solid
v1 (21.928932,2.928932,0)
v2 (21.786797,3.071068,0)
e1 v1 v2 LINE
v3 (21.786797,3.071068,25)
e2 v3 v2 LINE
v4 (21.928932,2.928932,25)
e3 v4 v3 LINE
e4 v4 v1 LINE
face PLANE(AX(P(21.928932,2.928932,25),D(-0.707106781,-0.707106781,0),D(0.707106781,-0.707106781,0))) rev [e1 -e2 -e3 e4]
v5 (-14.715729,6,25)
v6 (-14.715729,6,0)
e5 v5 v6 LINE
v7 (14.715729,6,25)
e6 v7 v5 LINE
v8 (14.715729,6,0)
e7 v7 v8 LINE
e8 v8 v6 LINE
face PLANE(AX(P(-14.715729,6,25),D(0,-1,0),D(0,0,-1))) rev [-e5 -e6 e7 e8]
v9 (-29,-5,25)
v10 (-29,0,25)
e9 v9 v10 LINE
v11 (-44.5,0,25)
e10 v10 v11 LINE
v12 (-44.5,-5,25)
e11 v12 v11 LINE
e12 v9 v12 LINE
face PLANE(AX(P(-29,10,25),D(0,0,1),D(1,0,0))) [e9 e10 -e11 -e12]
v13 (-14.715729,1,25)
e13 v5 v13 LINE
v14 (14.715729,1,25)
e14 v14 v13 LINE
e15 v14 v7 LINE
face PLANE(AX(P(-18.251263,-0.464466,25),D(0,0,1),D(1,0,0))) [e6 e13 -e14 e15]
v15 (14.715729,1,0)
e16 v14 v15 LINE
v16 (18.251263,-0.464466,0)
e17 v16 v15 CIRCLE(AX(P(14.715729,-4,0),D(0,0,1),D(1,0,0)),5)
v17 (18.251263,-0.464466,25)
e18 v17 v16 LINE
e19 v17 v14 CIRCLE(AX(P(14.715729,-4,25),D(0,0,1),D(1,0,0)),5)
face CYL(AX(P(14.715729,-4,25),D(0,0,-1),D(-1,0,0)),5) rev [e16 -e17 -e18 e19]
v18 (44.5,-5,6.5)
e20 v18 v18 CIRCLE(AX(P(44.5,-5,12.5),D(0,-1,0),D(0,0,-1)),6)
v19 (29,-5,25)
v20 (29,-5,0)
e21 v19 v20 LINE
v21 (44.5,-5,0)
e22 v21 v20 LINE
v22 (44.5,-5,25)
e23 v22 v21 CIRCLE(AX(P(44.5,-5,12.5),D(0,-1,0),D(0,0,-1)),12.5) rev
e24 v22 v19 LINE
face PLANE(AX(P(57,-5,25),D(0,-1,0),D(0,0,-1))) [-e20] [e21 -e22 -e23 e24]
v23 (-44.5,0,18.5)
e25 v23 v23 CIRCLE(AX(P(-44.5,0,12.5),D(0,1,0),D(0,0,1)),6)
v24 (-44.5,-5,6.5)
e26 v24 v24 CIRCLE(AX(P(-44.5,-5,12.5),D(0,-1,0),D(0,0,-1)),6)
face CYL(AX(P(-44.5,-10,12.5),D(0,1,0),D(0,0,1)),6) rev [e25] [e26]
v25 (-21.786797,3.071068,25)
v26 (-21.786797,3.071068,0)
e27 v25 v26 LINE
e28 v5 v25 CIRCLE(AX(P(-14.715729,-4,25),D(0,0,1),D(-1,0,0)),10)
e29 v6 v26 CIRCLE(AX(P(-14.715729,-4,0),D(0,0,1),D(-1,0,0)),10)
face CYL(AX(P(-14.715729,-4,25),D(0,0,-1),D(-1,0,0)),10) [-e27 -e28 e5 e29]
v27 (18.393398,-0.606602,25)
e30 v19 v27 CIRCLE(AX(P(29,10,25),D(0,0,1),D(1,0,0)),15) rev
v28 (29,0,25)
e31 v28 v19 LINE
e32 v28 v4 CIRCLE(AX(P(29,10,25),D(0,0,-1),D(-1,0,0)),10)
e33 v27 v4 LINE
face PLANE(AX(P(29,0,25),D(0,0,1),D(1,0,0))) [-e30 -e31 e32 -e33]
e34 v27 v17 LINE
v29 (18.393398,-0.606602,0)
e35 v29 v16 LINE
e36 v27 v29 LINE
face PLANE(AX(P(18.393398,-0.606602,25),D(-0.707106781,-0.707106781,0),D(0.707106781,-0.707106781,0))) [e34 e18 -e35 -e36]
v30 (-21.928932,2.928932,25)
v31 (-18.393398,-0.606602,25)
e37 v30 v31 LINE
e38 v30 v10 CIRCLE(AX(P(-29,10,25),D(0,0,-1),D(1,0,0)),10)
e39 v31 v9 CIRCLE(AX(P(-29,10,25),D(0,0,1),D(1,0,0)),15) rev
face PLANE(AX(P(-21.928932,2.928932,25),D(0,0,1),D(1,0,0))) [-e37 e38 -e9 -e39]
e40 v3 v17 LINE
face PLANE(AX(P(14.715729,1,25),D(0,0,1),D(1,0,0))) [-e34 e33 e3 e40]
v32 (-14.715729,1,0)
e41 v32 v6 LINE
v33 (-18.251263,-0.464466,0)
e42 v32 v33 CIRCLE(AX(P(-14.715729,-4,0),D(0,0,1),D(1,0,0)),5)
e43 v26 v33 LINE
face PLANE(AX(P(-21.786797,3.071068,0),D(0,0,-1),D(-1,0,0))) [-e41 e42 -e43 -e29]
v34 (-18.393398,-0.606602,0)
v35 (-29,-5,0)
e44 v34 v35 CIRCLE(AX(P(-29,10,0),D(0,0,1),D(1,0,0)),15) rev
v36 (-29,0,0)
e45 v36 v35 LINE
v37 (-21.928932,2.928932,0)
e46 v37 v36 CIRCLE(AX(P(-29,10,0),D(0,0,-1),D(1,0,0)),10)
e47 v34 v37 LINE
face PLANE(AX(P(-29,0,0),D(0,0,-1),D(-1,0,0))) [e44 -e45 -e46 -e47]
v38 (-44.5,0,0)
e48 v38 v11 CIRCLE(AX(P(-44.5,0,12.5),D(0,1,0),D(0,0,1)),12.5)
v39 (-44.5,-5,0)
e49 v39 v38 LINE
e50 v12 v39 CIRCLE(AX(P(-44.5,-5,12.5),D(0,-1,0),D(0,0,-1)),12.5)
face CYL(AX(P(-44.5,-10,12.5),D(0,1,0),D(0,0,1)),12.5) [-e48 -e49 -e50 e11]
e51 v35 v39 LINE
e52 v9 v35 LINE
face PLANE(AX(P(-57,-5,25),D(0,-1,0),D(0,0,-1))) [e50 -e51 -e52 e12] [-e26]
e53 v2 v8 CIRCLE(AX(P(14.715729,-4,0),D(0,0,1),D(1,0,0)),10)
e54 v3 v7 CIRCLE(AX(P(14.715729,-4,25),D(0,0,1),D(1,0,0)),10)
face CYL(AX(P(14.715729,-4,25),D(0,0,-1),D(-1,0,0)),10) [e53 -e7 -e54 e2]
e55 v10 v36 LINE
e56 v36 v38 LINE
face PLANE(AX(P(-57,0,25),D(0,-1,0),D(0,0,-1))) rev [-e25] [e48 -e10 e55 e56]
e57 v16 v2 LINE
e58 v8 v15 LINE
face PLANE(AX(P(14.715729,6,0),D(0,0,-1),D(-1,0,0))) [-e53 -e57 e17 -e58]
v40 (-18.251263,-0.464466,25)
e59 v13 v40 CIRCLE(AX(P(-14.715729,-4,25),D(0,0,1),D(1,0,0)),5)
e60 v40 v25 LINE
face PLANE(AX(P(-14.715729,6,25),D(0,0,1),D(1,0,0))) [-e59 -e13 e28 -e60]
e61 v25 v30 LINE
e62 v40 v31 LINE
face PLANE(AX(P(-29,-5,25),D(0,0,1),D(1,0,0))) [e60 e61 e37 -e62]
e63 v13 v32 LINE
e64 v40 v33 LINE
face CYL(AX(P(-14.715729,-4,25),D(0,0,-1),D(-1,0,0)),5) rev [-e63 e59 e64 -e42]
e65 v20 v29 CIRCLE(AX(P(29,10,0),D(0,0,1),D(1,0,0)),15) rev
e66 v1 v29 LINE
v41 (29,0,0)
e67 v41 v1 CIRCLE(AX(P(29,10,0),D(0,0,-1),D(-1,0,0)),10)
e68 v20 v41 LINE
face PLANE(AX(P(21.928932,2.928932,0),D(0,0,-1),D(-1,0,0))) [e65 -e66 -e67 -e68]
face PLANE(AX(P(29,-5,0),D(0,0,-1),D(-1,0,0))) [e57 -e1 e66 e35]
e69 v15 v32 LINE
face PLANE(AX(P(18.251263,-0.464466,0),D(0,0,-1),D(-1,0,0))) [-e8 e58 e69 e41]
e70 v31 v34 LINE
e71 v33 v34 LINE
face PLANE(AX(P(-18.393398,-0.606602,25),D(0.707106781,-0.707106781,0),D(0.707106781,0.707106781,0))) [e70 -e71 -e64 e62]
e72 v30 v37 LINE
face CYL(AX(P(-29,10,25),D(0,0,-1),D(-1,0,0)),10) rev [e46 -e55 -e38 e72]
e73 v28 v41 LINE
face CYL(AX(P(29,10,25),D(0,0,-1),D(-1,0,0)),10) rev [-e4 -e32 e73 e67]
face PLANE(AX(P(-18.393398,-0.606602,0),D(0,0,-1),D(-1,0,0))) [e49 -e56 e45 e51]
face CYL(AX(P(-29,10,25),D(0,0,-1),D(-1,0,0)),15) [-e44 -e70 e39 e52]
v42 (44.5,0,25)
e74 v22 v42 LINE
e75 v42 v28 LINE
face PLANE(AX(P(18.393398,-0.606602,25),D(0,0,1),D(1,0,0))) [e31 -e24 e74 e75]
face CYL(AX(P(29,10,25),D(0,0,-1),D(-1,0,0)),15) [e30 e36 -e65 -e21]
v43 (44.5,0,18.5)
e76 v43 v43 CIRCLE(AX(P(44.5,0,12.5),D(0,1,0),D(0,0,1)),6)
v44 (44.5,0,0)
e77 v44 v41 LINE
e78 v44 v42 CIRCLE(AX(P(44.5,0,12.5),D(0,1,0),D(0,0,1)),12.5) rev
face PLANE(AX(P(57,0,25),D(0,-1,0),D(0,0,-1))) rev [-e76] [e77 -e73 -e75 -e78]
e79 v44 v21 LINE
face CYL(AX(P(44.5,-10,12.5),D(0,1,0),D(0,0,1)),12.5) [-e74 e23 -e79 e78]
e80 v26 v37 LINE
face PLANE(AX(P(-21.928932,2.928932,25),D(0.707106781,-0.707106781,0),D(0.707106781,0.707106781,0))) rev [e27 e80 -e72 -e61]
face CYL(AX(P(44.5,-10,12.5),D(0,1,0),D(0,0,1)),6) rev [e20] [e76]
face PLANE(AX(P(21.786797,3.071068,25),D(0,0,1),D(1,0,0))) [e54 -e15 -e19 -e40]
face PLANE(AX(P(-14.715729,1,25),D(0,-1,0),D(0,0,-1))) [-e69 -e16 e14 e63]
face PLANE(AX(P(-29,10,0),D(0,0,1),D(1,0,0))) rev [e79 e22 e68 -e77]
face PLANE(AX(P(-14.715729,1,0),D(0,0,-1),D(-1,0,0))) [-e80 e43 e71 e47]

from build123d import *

# Parameters (mm, degrees)
BASE_FLANGE1_DEPTH = 25
SKETCH6_R          = 6
CUT_EXTRUDE1_DEPTH = 10


# Sheet-metal steps are written as plain solids
with BuildPart() as part:
    # Sketch1 → Base-Flange1 (new body)
    with BuildSketch(Plane.XY):
        with BuildLine():
            Line((-57, 0), (-29, 0))
            ThreePointArc((-29, 0), (-25.173165676, 0.761204675), (-21.928932188, 2.928932188))
            Line((-21.928932188, 2.928932188), (-21.786796564, 3.071067812))
            ThreePointArc((-21.786796564, 3.071067812), (-18.542563076, 5.238795325), (-14.715728753, 6))
            Line((-14.715728753, 6), (14.715728753, 6))
            ThreePointArc((14.715728753, 6), (18.542563076, 5.238795325), (21.786796564, 3.071067812))
            Line((21.786796564, 3.071067812), (21.928932188, 2.928932188))
            ThreePointArc((21.928932188, 2.928932188), (25.173165676, 0.761204675), (29, 0))
            Line((29, 0), (57, 0))
            Line((57, 0), (57, -5))
            Line((57, -5), (29, -5))
            ThreePointArc((29, -5), (23.259748515, -3.858192988), (18.393398282, -0.606601718))
            Line((18.393398282, -0.606601718), (18.251262658, -0.464466094))
            ThreePointArc((18.251262658, -0.464466094), (16.629145914, 0.619397663), (14.715728753, 1))
            Line((14.715728753, 1), (-14.715728753, 1))
            ThreePointArc((-14.715728753, 1), (-16.629145914, 0.619397663), (-18.251262658, -0.464466094))
            Line((-18.251262658, -0.464466094), (-18.393398282, -0.606601718))
            ThreePointArc((-18.393398282, -0.606601718), (-23.259748515, -3.858192988), (-29, -5))
            Line((-29, -5), (-57, -5))
            Line((-57, -5), (-57, 0))
        make_face()
    extrude(amount=BASE_FLANGE1_DEPTH)

    # Sketch6 → Cut-Extrude1 (cut)
    with BuildSketch(Plane(origin=(0, 0, 0), x_dir=(1, 0, 0), z_dir=(0, 1, 0))):
        with BuildLine():
            ThreePointArc((-44.5, -25), (-53.338834765, -21.338834765), (-57, -12.5))
            Line((-57, -12.5), (-57, -25))
            Line((-57, -25), (-44.5, -25))
        make_face()
        with BuildLine():
            Line((-44.5, 0), (-57, 0))
            Line((-57, 0), (-57, -12.5))
            ThreePointArc((-57, -12.5), (-53.338834765, -3.661165235), (-44.5, 0))
        make_face()
        with Locations(Location((-44.5, -12.5, 0), (0, 0, 270))):
            Circle(SKETCH6_R)
        with Locations(Location((44.5, -12.5, 0), (0, 0, 270))):
            Circle(SKETCH6_R)
        with BuildLine():
            ThreePointArc((44.5, 0), (53.338834765, -3.661165235), (57, -12.5))
            Line((57, -12.5), (57, 0))
            Line((57, 0), (44.5, 0))
        make_face()
        with BuildLine():
            Line((44.5, -25), (57, -25))
            Line((57, -25), (57, -12.5))
            ThreePointArc((57, -12.5), (53.338834765, -21.338834765), (44.5, -25))
        make_face()
    extrude(amount=-CUT_EXTRUDE1_DEPTH, mode=Mode.SUBTRACT)


solid = part.part
